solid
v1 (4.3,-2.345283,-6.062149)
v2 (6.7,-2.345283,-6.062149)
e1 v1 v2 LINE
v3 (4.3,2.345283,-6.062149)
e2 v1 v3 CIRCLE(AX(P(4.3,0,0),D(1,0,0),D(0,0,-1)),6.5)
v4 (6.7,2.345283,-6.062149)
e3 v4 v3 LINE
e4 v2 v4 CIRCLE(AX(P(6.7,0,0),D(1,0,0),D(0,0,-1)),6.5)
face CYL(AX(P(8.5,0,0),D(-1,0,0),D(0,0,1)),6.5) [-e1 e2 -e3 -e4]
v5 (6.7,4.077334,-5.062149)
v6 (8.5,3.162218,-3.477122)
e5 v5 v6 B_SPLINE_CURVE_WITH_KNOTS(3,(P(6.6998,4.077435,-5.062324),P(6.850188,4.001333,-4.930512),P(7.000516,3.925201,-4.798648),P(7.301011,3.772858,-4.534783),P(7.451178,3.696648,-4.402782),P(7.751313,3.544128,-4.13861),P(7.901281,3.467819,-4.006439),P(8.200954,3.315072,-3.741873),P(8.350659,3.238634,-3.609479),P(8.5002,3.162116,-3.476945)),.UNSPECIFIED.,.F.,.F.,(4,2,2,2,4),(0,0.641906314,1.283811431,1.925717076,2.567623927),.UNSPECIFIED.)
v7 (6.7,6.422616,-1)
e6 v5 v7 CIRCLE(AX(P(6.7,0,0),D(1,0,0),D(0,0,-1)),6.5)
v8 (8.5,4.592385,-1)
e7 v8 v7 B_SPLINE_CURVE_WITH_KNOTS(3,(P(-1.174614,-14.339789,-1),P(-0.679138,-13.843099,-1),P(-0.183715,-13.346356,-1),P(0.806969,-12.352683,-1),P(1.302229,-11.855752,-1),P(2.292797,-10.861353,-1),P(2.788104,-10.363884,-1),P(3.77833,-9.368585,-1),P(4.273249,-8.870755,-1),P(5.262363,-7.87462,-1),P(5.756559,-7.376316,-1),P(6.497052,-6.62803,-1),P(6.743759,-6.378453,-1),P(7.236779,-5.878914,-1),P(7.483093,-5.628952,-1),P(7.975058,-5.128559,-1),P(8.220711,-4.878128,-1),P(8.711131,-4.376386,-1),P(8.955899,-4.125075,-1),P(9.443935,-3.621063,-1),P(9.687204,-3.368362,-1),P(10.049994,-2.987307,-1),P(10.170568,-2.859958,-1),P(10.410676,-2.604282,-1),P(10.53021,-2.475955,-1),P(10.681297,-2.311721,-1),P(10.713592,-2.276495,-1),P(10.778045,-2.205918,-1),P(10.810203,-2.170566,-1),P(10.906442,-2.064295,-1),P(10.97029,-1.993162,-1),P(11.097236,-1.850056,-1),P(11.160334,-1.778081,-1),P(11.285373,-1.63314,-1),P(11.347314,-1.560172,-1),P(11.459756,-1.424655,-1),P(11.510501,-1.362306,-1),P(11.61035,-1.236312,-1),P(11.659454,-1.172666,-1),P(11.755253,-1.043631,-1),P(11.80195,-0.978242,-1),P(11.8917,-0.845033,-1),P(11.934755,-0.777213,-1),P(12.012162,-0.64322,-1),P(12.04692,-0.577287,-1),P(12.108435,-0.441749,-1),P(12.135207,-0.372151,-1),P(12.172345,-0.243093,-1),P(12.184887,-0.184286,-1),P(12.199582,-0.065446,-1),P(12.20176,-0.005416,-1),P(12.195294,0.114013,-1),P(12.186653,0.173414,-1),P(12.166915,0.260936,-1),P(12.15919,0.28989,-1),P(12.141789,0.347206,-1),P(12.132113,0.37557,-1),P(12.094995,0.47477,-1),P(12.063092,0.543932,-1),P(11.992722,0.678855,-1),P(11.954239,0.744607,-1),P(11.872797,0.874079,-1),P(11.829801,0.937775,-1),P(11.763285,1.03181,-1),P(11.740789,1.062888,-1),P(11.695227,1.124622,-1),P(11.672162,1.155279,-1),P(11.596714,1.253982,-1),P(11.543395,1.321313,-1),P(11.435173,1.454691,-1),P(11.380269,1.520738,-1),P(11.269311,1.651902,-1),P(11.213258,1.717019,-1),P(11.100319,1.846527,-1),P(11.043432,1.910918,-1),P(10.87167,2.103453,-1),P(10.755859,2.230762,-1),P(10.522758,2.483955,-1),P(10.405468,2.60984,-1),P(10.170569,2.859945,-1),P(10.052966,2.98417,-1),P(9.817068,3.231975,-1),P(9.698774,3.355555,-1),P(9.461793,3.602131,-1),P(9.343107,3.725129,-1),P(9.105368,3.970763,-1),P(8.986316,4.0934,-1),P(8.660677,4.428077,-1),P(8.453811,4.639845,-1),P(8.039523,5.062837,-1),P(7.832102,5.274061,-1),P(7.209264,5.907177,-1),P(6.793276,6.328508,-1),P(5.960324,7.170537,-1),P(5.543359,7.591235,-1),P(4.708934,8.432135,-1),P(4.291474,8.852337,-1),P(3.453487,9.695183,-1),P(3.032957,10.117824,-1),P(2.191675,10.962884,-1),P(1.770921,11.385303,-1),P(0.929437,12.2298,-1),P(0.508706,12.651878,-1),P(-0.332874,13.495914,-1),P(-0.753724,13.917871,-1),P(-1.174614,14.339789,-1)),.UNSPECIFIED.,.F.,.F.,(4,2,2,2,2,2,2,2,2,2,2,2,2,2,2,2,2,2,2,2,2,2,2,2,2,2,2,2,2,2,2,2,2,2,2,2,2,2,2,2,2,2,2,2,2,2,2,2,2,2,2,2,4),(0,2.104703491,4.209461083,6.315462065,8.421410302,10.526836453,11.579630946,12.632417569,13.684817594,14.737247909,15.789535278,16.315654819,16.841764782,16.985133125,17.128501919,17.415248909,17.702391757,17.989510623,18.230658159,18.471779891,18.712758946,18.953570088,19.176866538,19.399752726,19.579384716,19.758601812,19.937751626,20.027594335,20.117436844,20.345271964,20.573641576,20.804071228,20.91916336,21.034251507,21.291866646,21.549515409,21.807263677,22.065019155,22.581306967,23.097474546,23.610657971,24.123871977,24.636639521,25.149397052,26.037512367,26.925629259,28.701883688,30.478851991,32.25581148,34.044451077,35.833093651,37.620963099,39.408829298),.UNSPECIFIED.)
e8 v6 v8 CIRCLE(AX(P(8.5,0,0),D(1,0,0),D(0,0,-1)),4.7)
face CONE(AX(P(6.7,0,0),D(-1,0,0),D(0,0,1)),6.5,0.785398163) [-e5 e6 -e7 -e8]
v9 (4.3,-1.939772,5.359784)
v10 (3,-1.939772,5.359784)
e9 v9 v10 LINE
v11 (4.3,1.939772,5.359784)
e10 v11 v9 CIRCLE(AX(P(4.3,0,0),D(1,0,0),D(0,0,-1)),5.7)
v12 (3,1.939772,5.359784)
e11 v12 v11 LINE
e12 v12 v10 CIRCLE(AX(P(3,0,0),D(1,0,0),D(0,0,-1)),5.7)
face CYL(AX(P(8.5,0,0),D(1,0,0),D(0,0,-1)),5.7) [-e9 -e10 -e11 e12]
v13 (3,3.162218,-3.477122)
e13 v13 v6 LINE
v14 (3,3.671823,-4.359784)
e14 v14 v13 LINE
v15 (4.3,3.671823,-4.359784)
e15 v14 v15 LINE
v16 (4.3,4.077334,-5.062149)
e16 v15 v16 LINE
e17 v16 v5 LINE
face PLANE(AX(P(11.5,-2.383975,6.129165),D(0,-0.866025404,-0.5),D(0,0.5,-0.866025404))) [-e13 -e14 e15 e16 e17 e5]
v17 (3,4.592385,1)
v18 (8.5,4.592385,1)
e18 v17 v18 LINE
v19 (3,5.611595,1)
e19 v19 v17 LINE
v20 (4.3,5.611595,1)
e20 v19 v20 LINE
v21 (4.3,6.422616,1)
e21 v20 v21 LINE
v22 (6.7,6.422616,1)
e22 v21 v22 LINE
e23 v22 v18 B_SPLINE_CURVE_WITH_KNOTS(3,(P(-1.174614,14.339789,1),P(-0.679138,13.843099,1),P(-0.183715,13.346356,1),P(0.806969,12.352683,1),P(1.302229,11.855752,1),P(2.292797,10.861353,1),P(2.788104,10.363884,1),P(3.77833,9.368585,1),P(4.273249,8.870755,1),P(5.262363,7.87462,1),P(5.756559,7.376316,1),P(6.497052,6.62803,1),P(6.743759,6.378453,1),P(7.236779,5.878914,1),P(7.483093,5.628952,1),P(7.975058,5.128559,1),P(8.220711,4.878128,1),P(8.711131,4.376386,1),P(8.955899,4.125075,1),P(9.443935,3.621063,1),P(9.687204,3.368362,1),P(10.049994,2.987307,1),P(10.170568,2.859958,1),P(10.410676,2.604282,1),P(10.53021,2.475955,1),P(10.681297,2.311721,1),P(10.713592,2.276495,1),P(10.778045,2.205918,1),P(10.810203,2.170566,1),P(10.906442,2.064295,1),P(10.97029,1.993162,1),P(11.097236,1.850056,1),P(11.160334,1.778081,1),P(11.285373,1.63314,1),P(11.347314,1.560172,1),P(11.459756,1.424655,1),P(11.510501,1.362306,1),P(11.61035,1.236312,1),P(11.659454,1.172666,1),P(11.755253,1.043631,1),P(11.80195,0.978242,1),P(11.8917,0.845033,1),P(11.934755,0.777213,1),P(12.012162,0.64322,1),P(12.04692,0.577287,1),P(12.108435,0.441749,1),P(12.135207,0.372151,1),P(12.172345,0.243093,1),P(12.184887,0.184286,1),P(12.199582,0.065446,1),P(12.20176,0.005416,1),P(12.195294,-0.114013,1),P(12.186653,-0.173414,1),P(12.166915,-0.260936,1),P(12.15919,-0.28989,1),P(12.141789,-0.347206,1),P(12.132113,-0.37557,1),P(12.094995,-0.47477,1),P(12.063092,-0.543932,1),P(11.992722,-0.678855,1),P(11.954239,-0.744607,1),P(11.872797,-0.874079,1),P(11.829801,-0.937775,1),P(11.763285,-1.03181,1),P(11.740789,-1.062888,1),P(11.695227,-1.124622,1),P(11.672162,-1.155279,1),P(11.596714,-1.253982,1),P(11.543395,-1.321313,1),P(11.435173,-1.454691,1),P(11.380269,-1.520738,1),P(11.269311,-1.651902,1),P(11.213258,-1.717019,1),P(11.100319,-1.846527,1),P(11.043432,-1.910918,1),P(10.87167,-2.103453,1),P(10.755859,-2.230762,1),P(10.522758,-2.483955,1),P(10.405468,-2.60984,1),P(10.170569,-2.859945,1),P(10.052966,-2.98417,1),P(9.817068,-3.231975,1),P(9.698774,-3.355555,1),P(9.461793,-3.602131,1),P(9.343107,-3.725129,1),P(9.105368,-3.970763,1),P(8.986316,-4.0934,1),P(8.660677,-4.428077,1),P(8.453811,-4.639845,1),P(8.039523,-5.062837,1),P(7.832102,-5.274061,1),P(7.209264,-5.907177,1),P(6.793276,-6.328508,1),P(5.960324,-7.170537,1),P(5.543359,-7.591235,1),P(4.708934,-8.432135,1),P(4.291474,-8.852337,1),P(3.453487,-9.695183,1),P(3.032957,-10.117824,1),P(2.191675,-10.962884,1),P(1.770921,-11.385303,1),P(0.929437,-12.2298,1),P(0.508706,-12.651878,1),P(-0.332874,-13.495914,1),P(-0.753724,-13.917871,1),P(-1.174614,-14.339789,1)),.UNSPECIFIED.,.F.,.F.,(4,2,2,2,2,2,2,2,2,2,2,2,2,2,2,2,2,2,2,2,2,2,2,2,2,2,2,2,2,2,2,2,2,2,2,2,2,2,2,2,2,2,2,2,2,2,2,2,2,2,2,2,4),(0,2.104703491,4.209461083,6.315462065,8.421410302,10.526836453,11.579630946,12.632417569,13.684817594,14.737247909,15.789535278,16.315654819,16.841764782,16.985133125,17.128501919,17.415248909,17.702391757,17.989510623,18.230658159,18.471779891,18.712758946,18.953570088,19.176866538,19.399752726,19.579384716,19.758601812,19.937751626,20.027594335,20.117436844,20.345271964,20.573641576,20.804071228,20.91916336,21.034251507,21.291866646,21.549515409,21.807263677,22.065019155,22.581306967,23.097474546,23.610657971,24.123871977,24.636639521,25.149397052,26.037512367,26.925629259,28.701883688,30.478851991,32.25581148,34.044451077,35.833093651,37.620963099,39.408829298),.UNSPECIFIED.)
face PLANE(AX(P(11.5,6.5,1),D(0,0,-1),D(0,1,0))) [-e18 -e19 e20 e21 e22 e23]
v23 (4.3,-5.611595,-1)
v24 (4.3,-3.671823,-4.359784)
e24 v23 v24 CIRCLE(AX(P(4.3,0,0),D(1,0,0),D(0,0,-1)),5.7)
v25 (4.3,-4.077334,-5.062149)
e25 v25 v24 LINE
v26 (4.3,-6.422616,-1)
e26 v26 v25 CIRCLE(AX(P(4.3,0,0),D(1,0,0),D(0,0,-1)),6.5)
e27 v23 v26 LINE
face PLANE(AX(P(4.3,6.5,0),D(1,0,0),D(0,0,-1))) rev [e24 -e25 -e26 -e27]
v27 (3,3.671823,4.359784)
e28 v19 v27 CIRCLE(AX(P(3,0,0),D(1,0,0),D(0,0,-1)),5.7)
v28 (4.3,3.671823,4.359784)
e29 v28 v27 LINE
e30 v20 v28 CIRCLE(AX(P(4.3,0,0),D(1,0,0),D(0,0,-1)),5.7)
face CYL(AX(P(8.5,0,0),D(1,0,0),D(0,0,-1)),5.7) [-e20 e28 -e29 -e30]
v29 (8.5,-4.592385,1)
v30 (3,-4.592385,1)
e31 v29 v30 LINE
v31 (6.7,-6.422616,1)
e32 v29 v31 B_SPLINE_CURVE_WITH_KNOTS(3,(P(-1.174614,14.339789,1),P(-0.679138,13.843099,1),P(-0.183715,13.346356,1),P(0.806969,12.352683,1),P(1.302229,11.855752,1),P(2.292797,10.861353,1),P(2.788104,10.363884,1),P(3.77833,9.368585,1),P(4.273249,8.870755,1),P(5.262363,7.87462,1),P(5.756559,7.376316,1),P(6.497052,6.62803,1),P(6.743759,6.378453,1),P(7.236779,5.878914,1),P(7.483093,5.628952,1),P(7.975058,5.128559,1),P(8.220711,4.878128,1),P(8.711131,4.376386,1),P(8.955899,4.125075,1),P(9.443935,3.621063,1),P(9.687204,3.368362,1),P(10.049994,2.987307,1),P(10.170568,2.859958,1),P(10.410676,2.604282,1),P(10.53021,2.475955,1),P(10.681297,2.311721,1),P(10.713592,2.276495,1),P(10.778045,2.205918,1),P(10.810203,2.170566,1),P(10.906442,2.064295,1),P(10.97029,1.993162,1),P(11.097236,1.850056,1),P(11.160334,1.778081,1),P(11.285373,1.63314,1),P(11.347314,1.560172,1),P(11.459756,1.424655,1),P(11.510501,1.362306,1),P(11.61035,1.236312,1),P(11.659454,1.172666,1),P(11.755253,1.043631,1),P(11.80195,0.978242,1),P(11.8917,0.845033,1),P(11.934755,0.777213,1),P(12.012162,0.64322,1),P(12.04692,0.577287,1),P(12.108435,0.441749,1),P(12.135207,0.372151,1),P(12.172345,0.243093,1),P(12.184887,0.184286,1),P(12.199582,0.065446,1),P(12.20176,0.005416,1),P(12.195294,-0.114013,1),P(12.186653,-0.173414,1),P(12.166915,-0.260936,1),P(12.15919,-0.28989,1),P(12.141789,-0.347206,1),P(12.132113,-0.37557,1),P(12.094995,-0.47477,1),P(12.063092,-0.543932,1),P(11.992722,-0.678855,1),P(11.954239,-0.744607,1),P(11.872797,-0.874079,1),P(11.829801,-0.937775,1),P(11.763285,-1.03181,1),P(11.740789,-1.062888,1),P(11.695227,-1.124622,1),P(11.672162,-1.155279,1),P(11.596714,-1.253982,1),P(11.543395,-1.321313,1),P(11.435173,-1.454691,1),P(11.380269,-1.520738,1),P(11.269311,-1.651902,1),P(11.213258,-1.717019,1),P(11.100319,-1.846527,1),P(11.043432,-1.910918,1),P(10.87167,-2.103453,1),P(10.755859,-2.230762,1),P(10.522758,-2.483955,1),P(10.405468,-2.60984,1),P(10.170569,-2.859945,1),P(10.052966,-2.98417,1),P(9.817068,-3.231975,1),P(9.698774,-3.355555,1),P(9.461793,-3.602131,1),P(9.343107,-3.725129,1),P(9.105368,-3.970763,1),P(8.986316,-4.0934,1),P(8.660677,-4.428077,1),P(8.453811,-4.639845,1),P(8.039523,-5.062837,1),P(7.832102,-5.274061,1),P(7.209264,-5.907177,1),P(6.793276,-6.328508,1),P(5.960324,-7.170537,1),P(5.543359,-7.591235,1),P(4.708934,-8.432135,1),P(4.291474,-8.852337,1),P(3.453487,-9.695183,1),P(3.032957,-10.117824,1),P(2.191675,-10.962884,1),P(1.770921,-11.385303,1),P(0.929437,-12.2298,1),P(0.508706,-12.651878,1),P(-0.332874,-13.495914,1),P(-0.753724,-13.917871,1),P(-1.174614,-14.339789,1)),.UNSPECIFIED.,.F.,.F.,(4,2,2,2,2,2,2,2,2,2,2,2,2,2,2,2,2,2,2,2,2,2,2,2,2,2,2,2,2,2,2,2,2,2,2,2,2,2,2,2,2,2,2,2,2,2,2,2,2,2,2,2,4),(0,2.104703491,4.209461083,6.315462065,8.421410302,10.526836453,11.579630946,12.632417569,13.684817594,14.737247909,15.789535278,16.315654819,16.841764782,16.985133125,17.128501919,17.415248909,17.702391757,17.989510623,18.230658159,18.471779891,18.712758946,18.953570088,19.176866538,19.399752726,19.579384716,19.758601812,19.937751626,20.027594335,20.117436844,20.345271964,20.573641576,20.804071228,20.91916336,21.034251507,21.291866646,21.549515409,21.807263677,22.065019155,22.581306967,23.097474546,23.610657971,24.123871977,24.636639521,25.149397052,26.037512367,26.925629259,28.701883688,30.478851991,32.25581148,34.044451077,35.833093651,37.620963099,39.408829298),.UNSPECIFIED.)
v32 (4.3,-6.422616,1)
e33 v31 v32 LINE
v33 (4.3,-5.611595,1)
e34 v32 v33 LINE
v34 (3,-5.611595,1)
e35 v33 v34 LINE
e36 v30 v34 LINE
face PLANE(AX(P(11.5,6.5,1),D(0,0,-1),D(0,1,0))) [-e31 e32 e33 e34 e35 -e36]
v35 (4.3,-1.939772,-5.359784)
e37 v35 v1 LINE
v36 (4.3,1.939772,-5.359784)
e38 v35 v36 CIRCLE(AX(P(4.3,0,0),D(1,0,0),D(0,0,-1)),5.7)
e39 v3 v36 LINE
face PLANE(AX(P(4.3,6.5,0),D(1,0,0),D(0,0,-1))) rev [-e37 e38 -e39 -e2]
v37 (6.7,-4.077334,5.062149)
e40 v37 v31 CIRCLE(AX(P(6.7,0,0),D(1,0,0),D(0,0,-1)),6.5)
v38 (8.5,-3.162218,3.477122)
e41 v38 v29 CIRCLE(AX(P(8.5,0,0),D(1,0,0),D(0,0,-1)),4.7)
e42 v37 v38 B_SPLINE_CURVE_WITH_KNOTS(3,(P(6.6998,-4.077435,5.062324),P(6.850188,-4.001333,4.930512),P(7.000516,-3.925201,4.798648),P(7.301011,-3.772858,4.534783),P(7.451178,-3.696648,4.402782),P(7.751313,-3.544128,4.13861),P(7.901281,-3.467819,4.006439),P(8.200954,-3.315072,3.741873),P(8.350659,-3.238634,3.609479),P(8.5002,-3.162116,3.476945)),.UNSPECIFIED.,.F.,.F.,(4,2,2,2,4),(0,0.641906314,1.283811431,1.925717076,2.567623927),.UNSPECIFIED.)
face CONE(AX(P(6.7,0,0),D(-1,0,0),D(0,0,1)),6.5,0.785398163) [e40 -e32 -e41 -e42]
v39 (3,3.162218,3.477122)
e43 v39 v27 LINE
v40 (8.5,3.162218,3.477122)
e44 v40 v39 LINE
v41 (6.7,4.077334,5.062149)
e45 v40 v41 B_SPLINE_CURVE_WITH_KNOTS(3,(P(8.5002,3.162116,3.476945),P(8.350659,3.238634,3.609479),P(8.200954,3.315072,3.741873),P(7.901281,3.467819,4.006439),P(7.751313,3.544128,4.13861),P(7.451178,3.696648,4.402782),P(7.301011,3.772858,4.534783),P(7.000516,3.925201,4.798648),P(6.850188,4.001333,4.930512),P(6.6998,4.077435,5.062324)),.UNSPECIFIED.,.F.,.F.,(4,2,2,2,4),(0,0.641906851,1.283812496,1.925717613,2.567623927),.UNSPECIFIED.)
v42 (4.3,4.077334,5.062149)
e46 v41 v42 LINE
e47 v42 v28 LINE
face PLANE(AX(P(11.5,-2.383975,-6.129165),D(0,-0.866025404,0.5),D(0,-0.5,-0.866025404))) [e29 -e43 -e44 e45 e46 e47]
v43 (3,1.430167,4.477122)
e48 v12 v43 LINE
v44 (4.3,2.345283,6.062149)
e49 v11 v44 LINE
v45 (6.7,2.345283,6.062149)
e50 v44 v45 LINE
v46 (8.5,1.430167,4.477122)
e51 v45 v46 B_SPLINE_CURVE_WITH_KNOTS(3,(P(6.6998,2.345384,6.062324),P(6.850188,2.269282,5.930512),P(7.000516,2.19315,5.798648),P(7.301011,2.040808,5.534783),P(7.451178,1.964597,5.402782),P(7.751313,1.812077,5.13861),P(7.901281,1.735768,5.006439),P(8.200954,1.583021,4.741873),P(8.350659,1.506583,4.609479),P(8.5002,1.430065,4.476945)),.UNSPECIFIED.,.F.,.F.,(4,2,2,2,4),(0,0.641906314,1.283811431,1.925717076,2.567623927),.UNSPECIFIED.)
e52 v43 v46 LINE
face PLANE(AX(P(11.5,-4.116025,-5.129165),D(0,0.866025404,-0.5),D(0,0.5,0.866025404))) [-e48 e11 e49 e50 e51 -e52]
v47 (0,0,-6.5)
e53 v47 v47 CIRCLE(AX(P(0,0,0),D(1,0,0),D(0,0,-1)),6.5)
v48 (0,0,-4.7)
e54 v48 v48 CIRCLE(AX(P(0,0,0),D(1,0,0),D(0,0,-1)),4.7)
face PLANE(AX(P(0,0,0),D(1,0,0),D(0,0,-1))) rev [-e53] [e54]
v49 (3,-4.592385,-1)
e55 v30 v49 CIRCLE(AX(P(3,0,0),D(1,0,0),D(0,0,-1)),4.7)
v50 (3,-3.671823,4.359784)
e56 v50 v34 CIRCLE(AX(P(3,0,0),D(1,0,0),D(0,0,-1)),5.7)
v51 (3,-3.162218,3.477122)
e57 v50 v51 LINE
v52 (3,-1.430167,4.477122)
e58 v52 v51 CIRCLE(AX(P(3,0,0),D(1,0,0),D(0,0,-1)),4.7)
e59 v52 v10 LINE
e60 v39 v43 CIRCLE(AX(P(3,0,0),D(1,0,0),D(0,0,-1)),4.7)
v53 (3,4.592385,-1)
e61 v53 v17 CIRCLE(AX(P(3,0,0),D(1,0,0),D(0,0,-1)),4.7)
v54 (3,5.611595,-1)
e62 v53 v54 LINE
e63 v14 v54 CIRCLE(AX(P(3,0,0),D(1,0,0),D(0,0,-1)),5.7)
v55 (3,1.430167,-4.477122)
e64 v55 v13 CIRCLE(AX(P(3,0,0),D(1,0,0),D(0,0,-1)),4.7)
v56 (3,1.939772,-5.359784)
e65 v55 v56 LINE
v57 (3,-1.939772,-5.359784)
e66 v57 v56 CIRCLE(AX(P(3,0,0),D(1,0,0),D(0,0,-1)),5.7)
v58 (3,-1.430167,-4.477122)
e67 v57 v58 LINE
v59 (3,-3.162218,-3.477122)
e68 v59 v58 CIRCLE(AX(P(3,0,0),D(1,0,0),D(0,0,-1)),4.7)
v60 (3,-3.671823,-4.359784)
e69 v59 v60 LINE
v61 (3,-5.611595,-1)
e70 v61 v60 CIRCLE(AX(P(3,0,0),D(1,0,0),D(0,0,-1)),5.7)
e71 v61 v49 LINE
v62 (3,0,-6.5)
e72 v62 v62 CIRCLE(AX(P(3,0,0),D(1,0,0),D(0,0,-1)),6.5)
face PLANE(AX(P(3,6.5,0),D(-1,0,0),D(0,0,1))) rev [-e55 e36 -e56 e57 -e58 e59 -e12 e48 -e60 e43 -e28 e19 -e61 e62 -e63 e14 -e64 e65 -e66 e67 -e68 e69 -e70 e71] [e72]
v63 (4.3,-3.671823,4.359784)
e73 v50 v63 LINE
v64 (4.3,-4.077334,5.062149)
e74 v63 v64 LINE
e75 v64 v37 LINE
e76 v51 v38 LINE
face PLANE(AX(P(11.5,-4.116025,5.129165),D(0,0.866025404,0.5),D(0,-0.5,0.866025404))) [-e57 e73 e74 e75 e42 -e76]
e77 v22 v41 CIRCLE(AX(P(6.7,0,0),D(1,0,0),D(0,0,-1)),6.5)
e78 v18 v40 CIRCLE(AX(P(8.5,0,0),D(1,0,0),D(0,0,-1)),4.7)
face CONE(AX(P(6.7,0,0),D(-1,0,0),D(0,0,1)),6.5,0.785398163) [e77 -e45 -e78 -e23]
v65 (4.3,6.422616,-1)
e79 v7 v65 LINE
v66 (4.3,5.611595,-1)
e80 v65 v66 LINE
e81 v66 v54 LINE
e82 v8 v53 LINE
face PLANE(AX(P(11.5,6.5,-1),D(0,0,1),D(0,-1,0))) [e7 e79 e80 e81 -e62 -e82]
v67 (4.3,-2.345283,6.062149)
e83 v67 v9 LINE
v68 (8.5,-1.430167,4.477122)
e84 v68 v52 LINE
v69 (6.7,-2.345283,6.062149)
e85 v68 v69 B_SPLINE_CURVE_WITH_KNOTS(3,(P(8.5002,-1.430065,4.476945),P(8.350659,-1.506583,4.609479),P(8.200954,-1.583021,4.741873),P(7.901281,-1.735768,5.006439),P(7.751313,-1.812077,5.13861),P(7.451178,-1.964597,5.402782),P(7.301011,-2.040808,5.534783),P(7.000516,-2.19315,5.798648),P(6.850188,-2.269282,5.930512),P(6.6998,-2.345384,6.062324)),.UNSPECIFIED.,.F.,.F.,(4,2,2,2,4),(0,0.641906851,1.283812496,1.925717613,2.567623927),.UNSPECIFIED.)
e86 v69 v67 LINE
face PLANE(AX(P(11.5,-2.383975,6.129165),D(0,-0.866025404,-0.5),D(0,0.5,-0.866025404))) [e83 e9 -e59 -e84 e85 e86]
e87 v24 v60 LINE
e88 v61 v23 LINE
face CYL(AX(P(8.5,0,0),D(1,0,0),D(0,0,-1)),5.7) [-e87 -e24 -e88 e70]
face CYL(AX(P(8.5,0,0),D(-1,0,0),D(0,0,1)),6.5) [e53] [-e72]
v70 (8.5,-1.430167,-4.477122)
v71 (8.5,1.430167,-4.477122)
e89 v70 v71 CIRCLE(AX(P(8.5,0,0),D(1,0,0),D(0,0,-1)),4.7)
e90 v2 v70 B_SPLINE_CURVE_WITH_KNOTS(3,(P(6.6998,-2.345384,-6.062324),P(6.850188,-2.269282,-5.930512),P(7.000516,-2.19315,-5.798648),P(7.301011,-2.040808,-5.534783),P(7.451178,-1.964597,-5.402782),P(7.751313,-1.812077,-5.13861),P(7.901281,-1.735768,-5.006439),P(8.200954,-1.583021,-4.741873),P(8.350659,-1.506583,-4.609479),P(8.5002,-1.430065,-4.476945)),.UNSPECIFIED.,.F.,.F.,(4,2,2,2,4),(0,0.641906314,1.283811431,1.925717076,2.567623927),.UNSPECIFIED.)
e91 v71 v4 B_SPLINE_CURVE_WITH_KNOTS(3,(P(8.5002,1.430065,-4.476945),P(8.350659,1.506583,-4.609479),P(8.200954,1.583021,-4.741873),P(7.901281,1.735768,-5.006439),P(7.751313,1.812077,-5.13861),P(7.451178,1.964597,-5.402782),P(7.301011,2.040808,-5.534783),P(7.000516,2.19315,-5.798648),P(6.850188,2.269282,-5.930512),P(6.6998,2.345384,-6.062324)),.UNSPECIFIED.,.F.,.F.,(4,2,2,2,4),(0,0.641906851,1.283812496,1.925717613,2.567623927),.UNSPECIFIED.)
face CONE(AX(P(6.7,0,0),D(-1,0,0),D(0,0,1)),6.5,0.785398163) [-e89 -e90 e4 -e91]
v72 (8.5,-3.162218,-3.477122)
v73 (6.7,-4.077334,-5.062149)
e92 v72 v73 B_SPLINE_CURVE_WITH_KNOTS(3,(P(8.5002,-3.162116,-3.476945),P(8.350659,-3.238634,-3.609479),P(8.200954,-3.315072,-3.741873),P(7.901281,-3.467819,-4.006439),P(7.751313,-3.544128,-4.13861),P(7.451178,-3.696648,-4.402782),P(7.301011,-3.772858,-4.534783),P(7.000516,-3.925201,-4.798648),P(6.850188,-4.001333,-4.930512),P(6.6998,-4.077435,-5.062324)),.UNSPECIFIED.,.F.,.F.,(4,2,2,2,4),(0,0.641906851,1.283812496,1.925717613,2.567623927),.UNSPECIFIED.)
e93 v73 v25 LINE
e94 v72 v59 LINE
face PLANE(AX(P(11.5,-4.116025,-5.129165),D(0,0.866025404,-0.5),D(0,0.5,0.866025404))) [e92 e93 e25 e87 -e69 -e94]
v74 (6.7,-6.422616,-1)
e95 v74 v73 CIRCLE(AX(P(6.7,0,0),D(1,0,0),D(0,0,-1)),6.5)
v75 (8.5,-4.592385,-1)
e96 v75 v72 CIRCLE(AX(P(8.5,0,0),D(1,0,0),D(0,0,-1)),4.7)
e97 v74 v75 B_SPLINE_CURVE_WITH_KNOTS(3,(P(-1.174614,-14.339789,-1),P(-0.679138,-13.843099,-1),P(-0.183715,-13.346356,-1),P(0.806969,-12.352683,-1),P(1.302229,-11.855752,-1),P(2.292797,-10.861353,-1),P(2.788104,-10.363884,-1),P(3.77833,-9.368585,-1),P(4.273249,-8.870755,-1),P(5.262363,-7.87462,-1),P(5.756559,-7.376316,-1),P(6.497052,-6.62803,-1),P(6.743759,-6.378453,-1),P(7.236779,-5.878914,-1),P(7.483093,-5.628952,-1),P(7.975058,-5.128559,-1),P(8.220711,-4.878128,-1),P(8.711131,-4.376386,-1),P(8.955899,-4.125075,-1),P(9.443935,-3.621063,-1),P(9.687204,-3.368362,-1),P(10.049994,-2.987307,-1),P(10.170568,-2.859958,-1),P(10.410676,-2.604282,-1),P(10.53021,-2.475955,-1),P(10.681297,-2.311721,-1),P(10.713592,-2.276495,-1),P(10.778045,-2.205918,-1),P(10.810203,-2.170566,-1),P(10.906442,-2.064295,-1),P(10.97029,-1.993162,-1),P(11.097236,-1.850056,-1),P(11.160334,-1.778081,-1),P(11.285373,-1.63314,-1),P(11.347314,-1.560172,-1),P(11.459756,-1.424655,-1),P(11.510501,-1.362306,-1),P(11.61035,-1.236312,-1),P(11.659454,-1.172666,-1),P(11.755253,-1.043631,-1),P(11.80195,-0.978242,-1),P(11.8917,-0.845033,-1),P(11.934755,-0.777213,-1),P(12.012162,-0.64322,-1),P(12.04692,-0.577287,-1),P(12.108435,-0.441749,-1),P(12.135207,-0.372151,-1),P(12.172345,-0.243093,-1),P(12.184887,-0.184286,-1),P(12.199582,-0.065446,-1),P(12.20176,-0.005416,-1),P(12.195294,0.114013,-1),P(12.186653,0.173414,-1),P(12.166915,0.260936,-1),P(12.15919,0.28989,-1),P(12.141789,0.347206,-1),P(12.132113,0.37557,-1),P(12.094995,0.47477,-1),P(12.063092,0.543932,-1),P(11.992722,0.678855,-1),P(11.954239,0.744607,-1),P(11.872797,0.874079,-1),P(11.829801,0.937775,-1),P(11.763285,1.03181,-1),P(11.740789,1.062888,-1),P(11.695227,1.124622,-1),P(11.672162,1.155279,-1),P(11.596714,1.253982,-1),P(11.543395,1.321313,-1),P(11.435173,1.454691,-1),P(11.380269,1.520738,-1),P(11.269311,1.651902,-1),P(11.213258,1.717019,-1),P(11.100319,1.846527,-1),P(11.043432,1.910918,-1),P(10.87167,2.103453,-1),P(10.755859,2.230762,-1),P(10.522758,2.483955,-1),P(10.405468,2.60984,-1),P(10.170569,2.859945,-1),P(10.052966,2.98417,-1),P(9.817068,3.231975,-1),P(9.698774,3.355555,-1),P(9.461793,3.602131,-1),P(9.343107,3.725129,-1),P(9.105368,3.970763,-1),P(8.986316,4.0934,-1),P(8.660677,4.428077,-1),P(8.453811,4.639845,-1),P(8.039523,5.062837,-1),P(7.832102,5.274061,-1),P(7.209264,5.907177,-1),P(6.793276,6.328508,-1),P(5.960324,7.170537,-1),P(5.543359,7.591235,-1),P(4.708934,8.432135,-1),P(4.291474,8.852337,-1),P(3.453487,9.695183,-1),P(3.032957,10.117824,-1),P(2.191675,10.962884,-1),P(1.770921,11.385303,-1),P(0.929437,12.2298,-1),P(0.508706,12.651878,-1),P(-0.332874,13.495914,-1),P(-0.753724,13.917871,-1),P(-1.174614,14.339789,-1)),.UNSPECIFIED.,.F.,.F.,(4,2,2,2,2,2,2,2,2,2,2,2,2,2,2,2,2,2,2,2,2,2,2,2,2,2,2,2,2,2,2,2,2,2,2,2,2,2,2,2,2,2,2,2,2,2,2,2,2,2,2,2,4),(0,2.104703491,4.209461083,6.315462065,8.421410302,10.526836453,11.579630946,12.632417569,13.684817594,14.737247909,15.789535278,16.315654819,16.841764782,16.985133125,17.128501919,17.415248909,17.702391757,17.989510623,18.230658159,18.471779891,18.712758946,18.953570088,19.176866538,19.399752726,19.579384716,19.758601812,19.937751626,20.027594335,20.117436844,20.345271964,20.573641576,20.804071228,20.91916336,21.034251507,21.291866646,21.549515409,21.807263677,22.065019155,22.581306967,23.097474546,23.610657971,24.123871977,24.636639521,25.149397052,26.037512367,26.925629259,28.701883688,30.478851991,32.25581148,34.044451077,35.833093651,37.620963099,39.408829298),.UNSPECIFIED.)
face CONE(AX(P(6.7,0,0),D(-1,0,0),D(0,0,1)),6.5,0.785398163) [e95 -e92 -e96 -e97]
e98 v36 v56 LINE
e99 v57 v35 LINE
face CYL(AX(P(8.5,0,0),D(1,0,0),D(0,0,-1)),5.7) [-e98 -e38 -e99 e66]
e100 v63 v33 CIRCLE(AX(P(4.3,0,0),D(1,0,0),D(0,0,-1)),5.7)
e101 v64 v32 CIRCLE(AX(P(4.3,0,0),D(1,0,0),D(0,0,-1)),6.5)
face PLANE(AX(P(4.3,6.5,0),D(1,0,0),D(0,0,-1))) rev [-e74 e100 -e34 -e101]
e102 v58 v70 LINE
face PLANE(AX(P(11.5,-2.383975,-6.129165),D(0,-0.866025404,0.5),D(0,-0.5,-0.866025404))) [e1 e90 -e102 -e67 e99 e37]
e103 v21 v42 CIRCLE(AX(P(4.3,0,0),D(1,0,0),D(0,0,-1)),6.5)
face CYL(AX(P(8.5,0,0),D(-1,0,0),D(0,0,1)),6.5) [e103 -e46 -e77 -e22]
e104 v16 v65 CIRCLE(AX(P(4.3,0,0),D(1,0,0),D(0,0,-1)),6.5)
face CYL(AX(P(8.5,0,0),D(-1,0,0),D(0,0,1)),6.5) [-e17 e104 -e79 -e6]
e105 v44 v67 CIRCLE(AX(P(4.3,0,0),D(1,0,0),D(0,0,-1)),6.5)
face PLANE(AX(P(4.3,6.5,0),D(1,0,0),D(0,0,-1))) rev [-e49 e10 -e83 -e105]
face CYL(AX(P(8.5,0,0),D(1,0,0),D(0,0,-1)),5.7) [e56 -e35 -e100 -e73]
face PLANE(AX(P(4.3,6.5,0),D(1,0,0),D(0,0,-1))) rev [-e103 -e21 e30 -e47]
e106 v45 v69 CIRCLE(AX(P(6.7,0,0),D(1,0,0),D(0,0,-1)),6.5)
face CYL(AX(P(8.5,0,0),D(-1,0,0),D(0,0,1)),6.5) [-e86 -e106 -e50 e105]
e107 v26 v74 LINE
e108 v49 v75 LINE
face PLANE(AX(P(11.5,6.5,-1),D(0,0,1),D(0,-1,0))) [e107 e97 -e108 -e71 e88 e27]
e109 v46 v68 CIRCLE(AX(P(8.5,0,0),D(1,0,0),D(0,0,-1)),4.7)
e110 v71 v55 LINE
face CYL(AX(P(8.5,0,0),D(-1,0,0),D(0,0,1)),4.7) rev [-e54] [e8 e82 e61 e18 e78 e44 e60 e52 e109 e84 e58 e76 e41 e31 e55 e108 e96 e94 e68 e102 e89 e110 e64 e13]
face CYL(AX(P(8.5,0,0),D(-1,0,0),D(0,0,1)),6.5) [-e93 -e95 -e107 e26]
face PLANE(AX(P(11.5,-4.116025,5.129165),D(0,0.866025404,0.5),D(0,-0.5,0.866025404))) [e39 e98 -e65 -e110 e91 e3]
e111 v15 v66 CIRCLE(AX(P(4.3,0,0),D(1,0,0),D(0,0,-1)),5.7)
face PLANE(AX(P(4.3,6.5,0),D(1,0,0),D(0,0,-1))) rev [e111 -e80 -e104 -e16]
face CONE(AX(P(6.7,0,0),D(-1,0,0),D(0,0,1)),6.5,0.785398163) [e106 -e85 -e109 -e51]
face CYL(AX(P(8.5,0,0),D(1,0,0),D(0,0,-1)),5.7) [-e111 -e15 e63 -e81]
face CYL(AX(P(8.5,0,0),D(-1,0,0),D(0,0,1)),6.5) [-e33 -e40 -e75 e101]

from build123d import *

# Parameters (mm, degrees)
SKETCH_1_R               = 6.5
SKETCH_1_R_2             = 4.7
EXTRUDE_1_DEPTH          = 8.5
SKETCH_2_W               = 1.3
SKETCH_2_H               = 0.8
SKETCH_4_W               = 2
SKETCH_4_H               = 13
CUT_EXTRUDE_1_DEPTH      = 8.5
PATTERN_START            = 3
PATTERN_CIRCULAR_1_DEPTH = 5.5000001


# Read off the part's stored shape, not the designer's step: Круговой массив1
with BuildPart() as part:
    # Эскиз1 → Вытянуть1 (new body)
    with BuildSketch(Plane(origin=(0, 0, 0), x_dir=(0, 0, -1), z_dir=(1, 0, 0))):
        Circle(SKETCH_1_R)
        Circle(SKETCH_1_R_2, mode=Mode.SUBTRACT)
    extrude(amount=EXTRUDE_1_DEPTH)

    # Эскиз2 → Вырез-Повернуть1 (revolve, cut)
    with BuildSketch(Plane.XY, mode=Mode.PRIVATE) as cut_revolve_1_sk:
        with Locations((3.65, 6.1)):
            Rectangle(SKETCH_2_W, SKETCH_2_H)
    revolve(cut_revolve_1_sk.sketch.rotate(Axis((8.5, 0, 0), (-1, 0, 0)), 90), axis=Axis((8.5, 0, 0), (-1, 0, 0)), mode=Mode.SUBTRACT)

    # Эскиз3 → Вырез-Повернуть2 (revolve, cut)
    with BuildSketch(Plane.XY, mode=Mode.PRIVATE) as cut_revolve_2_sk:
        Polygon((8.5, 4.7), (6.7, 6.5), (8.5, 6.5), align=None)
    revolve(cut_revolve_2_sk.sketch.rotate(Axis((8.5, 0, 0), (-1, 0, 0)), 90), axis=Axis((8.5, 0, 0), (-1, 0, 0)), mode=Mode.SUBTRACT)

    # Эскиз4 → Вырез-Вытянуть1 (cut)
    with BuildSketch(Plane(origin=(3, 0, 0), x_dir=(0, 0, -1), z_dir=(1, 0, 0))):
        Rectangle(SKETCH_4_W, SKETCH_4_H)
    extrude(amount=CUT_EXTRUDE_1_DEPTH, mode=Mode.SUBTRACT)

    # Круговой массив1 outline → Круговой массив1 (cut)
    with BuildSketch(Plane.YZ.offset(PATTERN_START)):
        with BuildLine():
            ThreePointArc((3.162217904, -3.477122075), (2.35, -4.070319398), (1.430167097, -4.477122075))
            Line((1.430167097, -4.477122075), (2.345282741, -6.062148865))
            ThreePointArc((2.345282741, -6.062148865), (3.25, -5.629165125), (4.077333548, -5.062148865))
            Line((4.077333548, -5.062148865), (3.162217904, -3.477122075))
        make_face()
        with BuildLine():
            ThreePointArc((-1.430167097, -4.477122075), (-2.35, -4.070319398), (-3.162217904, -3.477122075))
            Line((-3.162217904, -3.477122075), (-4.077333548, -5.062148865))
            ThreePointArc((-4.077333548, -5.062148865), (-3.25, -5.629165125), (-2.345282741, -6.062148865))
            Line((-2.345282741, -6.062148865), (-1.430167097, -4.477122075))
        make_face()
        with BuildLine():
            ThreePointArc((1.430167097, 4.477122075), (2.35, 4.070319398), (3.162217904, 3.477122075))
            Line((3.162217904, 3.477122075), (4.077333548, 5.062148865))
            ThreePointArc((4.077333548, 5.062148865), (3.25, 5.629165125), (2.345282741, 6.062148865))
            Line((2.345282741, 6.062148865), (1.430167097, 4.477122075))
        make_face()
        with BuildLine():
            ThreePointArc((-3.162217904, 3.477122075), (-2.35, 4.070319398), (-1.430167097, 4.477122075))
            Line((-1.430167097, 4.477122075), (-2.345282741, 6.062148865))
            ThreePointArc((-2.345282741, 6.062148865), (-3.25, 5.629165125), (-4.077333548, 5.062148865))
            Line((-4.077333548, 5.062148865), (-3.162217904, 3.477122075))
        make_face()
    extrude(amount=PATTERN_CIRCULAR_1_DEPTH, mode=Mode.SUBTRACT)


solid = part.part
